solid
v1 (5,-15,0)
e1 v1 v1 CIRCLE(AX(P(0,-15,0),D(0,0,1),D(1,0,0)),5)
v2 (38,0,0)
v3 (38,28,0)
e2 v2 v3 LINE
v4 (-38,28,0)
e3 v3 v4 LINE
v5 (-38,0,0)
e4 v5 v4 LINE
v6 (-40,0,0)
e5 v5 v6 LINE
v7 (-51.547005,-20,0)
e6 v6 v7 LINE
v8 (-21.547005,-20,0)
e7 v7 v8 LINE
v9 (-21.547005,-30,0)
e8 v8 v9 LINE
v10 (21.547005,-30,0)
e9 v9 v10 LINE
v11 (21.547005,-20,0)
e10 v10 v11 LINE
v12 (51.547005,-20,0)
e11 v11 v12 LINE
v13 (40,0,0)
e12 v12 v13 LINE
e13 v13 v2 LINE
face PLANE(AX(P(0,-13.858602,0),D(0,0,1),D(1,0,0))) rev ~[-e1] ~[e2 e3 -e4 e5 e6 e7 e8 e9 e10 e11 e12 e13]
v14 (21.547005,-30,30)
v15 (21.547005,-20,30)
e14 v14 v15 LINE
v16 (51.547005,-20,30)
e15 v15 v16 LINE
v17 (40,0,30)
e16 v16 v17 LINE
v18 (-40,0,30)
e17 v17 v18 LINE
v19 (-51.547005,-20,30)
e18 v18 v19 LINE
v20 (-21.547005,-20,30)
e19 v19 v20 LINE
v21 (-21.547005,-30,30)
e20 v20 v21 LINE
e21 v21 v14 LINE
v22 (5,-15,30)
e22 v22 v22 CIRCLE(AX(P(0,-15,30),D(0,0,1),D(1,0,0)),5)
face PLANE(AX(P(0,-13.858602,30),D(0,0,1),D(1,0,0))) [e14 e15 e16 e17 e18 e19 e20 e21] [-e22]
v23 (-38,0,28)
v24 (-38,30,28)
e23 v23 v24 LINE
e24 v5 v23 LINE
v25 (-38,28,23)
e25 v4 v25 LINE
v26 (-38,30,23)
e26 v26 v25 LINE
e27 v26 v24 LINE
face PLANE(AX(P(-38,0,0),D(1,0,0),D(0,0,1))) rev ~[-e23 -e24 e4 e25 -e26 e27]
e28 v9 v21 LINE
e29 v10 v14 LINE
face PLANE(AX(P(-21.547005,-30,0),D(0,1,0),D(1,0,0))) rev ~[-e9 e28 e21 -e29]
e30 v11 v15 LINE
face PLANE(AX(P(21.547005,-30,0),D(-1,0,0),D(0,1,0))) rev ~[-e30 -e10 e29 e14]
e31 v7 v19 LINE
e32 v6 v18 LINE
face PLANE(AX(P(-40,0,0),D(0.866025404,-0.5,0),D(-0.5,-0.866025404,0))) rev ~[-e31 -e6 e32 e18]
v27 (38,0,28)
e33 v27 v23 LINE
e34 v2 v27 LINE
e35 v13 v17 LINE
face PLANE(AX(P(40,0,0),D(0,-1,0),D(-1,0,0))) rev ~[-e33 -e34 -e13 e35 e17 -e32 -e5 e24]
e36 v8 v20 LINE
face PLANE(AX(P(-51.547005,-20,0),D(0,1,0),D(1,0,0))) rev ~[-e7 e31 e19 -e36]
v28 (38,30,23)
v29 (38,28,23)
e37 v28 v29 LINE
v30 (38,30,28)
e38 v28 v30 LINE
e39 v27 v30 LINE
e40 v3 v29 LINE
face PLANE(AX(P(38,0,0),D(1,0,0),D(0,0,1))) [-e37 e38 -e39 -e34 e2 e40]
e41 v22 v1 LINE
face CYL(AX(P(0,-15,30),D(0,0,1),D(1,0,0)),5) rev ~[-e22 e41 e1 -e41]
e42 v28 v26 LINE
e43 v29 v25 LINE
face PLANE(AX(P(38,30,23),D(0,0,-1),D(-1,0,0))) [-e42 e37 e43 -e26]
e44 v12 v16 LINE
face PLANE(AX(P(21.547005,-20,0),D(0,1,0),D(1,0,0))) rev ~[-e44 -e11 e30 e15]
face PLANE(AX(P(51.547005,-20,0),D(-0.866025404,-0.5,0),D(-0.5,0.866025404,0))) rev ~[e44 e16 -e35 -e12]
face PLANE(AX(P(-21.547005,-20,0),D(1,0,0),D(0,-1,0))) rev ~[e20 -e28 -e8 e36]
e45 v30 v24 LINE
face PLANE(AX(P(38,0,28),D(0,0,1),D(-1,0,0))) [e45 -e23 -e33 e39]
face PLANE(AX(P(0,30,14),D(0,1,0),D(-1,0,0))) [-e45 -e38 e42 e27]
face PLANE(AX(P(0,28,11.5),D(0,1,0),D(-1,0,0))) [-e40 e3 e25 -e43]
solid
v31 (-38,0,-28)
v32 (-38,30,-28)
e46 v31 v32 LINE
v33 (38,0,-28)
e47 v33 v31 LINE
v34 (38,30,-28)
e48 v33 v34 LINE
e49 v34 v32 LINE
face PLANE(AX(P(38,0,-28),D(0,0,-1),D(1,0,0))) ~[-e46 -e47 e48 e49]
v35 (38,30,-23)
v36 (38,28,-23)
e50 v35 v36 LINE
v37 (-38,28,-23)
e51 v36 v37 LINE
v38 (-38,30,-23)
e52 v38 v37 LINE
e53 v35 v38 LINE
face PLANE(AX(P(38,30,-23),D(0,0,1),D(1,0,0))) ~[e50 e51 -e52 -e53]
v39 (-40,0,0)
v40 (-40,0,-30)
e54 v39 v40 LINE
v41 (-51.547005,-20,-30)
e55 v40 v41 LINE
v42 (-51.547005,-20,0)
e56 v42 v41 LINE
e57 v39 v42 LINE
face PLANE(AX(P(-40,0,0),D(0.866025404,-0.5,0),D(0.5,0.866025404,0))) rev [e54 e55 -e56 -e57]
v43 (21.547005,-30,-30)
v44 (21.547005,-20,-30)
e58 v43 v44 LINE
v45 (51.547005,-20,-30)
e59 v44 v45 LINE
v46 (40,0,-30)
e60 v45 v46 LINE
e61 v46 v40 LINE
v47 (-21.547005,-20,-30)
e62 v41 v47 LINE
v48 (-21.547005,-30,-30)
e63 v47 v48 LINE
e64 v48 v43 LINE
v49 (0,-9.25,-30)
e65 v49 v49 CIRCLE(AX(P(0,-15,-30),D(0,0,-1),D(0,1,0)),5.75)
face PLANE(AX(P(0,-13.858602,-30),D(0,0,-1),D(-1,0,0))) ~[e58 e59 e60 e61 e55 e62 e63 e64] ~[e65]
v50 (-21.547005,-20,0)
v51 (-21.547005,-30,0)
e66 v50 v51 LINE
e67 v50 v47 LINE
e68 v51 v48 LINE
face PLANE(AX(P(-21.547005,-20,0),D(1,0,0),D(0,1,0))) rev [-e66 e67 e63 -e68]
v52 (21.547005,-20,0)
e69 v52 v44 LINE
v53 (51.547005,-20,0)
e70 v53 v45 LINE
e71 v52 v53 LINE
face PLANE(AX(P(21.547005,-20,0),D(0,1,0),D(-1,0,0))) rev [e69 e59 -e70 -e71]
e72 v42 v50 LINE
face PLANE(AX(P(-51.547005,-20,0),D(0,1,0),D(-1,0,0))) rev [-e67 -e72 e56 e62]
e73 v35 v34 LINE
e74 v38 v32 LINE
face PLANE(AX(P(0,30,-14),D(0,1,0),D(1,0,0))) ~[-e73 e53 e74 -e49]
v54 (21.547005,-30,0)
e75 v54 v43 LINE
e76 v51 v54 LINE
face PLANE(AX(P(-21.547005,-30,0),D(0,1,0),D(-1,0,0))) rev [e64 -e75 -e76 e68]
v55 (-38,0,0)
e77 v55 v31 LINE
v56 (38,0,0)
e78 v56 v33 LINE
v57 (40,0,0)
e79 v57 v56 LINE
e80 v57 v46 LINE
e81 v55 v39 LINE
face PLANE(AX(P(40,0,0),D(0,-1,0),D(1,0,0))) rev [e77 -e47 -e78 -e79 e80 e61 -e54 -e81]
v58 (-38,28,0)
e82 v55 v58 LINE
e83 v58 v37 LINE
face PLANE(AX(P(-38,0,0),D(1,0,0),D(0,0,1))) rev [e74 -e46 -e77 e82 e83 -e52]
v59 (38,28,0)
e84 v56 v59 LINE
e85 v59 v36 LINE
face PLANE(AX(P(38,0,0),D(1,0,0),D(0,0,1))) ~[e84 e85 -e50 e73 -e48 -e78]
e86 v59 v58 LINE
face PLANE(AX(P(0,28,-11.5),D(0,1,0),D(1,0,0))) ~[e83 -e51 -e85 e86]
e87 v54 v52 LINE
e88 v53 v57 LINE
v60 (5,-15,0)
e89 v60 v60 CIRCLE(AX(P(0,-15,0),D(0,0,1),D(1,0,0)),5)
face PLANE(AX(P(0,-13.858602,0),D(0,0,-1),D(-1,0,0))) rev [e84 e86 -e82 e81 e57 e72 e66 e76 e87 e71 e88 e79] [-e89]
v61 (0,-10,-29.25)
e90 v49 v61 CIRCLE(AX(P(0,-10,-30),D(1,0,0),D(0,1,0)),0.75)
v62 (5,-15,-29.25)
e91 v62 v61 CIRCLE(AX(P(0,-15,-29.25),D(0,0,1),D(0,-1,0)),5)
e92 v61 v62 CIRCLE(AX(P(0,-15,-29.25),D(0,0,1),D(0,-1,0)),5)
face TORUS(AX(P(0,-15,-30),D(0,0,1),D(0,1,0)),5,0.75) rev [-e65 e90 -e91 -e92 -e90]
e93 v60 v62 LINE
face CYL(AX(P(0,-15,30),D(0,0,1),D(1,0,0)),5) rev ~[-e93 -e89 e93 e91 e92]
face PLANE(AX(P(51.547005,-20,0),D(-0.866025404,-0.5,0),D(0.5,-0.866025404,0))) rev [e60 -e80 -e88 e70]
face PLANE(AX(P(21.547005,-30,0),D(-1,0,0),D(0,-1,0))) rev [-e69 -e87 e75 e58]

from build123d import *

# Parameters (mm, degrees)
F1_DEPTH = 30
F2_W     = 76
F2_H     = 28
F3_DEPTH = 30
F4_W     = 76
F4_H     = 23
F5_DEPTH = 2
F7_R     = 5
F8_DEPTH = 60
F9_R     = 0.75


# Not quite as in the source:
# - a feature names something its author has since deleted; it is built from what else it names


with BuildPart() as f1:
    # F0 (on Top) → F1 (new body)
    with BuildSketch(Plane.XY):
        Polygon((40, 0), (-40, 0), (-51.5470053838, -20), (-21.5470053838, -20), (-21.5470053838, -30), (21.5470053838, -30), (21.5470053838, -20), (51.5470053838, -20), align=None)
    extrude(amount=F1_DEPTH)

    # F2 (on face) → F3 (join)
    with BuildSketch(Plane(origin=(0, 0, 0), x_dir=(-1, 0, 0), z_dir=(0, 1, 0))):
        with Locations((0, 14)):
            Rectangle(F2_W, F2_H)
    extrude(amount=F3_DEPTH)

    # F4 (on face) → F5 (cut)
    with BuildSketch(Plane(origin=(0, 30, 0), x_dir=(-1, 0, 0), z_dir=(0, 1, 0))):
        with Locations((0, 11.5)):
            Rectangle(F4_W, F4_H)
    extrude(amount=-F5_DEPTH, mode=Mode.SUBTRACT)


with BuildPart() as f6_1:
    # F6: instance of F1
    add(f1.part.mirror(Plane.XY))


with BuildPart() as f8_tool:
    # F7 (on face) → F8 (new body, through all)
    with BuildSketch(Plane.XY.offset(30)):
        with Locations((0, -15)):
            Circle(F7_R)
    extrude(amount=-F8_DEPTH)


with BuildPart() as f1_1:
    add(f1.part)

    # F8: cut by f8_tool
    add(f8_tool.part, mode=Mode.SUBTRACT)


with BuildPart() as f6_1_1:
    add(f6_1.part)

    # F8: cut by f8_tool
    add(f8_tool.part, mode=Mode.SUBTRACT)

    # F9 (on Right) → F10 (revolve, cut)
    with BuildSketch(Plane.YZ):
        with Locations((-10, -30)):
            Circle(F9_R)
    revolve(axis=Axis((0, -15, -32.4979101866), (0, 0, -1)), mode=Mode.SUBTRACT)


solid = Compound([f1_1.part, f6_1_1.part])
